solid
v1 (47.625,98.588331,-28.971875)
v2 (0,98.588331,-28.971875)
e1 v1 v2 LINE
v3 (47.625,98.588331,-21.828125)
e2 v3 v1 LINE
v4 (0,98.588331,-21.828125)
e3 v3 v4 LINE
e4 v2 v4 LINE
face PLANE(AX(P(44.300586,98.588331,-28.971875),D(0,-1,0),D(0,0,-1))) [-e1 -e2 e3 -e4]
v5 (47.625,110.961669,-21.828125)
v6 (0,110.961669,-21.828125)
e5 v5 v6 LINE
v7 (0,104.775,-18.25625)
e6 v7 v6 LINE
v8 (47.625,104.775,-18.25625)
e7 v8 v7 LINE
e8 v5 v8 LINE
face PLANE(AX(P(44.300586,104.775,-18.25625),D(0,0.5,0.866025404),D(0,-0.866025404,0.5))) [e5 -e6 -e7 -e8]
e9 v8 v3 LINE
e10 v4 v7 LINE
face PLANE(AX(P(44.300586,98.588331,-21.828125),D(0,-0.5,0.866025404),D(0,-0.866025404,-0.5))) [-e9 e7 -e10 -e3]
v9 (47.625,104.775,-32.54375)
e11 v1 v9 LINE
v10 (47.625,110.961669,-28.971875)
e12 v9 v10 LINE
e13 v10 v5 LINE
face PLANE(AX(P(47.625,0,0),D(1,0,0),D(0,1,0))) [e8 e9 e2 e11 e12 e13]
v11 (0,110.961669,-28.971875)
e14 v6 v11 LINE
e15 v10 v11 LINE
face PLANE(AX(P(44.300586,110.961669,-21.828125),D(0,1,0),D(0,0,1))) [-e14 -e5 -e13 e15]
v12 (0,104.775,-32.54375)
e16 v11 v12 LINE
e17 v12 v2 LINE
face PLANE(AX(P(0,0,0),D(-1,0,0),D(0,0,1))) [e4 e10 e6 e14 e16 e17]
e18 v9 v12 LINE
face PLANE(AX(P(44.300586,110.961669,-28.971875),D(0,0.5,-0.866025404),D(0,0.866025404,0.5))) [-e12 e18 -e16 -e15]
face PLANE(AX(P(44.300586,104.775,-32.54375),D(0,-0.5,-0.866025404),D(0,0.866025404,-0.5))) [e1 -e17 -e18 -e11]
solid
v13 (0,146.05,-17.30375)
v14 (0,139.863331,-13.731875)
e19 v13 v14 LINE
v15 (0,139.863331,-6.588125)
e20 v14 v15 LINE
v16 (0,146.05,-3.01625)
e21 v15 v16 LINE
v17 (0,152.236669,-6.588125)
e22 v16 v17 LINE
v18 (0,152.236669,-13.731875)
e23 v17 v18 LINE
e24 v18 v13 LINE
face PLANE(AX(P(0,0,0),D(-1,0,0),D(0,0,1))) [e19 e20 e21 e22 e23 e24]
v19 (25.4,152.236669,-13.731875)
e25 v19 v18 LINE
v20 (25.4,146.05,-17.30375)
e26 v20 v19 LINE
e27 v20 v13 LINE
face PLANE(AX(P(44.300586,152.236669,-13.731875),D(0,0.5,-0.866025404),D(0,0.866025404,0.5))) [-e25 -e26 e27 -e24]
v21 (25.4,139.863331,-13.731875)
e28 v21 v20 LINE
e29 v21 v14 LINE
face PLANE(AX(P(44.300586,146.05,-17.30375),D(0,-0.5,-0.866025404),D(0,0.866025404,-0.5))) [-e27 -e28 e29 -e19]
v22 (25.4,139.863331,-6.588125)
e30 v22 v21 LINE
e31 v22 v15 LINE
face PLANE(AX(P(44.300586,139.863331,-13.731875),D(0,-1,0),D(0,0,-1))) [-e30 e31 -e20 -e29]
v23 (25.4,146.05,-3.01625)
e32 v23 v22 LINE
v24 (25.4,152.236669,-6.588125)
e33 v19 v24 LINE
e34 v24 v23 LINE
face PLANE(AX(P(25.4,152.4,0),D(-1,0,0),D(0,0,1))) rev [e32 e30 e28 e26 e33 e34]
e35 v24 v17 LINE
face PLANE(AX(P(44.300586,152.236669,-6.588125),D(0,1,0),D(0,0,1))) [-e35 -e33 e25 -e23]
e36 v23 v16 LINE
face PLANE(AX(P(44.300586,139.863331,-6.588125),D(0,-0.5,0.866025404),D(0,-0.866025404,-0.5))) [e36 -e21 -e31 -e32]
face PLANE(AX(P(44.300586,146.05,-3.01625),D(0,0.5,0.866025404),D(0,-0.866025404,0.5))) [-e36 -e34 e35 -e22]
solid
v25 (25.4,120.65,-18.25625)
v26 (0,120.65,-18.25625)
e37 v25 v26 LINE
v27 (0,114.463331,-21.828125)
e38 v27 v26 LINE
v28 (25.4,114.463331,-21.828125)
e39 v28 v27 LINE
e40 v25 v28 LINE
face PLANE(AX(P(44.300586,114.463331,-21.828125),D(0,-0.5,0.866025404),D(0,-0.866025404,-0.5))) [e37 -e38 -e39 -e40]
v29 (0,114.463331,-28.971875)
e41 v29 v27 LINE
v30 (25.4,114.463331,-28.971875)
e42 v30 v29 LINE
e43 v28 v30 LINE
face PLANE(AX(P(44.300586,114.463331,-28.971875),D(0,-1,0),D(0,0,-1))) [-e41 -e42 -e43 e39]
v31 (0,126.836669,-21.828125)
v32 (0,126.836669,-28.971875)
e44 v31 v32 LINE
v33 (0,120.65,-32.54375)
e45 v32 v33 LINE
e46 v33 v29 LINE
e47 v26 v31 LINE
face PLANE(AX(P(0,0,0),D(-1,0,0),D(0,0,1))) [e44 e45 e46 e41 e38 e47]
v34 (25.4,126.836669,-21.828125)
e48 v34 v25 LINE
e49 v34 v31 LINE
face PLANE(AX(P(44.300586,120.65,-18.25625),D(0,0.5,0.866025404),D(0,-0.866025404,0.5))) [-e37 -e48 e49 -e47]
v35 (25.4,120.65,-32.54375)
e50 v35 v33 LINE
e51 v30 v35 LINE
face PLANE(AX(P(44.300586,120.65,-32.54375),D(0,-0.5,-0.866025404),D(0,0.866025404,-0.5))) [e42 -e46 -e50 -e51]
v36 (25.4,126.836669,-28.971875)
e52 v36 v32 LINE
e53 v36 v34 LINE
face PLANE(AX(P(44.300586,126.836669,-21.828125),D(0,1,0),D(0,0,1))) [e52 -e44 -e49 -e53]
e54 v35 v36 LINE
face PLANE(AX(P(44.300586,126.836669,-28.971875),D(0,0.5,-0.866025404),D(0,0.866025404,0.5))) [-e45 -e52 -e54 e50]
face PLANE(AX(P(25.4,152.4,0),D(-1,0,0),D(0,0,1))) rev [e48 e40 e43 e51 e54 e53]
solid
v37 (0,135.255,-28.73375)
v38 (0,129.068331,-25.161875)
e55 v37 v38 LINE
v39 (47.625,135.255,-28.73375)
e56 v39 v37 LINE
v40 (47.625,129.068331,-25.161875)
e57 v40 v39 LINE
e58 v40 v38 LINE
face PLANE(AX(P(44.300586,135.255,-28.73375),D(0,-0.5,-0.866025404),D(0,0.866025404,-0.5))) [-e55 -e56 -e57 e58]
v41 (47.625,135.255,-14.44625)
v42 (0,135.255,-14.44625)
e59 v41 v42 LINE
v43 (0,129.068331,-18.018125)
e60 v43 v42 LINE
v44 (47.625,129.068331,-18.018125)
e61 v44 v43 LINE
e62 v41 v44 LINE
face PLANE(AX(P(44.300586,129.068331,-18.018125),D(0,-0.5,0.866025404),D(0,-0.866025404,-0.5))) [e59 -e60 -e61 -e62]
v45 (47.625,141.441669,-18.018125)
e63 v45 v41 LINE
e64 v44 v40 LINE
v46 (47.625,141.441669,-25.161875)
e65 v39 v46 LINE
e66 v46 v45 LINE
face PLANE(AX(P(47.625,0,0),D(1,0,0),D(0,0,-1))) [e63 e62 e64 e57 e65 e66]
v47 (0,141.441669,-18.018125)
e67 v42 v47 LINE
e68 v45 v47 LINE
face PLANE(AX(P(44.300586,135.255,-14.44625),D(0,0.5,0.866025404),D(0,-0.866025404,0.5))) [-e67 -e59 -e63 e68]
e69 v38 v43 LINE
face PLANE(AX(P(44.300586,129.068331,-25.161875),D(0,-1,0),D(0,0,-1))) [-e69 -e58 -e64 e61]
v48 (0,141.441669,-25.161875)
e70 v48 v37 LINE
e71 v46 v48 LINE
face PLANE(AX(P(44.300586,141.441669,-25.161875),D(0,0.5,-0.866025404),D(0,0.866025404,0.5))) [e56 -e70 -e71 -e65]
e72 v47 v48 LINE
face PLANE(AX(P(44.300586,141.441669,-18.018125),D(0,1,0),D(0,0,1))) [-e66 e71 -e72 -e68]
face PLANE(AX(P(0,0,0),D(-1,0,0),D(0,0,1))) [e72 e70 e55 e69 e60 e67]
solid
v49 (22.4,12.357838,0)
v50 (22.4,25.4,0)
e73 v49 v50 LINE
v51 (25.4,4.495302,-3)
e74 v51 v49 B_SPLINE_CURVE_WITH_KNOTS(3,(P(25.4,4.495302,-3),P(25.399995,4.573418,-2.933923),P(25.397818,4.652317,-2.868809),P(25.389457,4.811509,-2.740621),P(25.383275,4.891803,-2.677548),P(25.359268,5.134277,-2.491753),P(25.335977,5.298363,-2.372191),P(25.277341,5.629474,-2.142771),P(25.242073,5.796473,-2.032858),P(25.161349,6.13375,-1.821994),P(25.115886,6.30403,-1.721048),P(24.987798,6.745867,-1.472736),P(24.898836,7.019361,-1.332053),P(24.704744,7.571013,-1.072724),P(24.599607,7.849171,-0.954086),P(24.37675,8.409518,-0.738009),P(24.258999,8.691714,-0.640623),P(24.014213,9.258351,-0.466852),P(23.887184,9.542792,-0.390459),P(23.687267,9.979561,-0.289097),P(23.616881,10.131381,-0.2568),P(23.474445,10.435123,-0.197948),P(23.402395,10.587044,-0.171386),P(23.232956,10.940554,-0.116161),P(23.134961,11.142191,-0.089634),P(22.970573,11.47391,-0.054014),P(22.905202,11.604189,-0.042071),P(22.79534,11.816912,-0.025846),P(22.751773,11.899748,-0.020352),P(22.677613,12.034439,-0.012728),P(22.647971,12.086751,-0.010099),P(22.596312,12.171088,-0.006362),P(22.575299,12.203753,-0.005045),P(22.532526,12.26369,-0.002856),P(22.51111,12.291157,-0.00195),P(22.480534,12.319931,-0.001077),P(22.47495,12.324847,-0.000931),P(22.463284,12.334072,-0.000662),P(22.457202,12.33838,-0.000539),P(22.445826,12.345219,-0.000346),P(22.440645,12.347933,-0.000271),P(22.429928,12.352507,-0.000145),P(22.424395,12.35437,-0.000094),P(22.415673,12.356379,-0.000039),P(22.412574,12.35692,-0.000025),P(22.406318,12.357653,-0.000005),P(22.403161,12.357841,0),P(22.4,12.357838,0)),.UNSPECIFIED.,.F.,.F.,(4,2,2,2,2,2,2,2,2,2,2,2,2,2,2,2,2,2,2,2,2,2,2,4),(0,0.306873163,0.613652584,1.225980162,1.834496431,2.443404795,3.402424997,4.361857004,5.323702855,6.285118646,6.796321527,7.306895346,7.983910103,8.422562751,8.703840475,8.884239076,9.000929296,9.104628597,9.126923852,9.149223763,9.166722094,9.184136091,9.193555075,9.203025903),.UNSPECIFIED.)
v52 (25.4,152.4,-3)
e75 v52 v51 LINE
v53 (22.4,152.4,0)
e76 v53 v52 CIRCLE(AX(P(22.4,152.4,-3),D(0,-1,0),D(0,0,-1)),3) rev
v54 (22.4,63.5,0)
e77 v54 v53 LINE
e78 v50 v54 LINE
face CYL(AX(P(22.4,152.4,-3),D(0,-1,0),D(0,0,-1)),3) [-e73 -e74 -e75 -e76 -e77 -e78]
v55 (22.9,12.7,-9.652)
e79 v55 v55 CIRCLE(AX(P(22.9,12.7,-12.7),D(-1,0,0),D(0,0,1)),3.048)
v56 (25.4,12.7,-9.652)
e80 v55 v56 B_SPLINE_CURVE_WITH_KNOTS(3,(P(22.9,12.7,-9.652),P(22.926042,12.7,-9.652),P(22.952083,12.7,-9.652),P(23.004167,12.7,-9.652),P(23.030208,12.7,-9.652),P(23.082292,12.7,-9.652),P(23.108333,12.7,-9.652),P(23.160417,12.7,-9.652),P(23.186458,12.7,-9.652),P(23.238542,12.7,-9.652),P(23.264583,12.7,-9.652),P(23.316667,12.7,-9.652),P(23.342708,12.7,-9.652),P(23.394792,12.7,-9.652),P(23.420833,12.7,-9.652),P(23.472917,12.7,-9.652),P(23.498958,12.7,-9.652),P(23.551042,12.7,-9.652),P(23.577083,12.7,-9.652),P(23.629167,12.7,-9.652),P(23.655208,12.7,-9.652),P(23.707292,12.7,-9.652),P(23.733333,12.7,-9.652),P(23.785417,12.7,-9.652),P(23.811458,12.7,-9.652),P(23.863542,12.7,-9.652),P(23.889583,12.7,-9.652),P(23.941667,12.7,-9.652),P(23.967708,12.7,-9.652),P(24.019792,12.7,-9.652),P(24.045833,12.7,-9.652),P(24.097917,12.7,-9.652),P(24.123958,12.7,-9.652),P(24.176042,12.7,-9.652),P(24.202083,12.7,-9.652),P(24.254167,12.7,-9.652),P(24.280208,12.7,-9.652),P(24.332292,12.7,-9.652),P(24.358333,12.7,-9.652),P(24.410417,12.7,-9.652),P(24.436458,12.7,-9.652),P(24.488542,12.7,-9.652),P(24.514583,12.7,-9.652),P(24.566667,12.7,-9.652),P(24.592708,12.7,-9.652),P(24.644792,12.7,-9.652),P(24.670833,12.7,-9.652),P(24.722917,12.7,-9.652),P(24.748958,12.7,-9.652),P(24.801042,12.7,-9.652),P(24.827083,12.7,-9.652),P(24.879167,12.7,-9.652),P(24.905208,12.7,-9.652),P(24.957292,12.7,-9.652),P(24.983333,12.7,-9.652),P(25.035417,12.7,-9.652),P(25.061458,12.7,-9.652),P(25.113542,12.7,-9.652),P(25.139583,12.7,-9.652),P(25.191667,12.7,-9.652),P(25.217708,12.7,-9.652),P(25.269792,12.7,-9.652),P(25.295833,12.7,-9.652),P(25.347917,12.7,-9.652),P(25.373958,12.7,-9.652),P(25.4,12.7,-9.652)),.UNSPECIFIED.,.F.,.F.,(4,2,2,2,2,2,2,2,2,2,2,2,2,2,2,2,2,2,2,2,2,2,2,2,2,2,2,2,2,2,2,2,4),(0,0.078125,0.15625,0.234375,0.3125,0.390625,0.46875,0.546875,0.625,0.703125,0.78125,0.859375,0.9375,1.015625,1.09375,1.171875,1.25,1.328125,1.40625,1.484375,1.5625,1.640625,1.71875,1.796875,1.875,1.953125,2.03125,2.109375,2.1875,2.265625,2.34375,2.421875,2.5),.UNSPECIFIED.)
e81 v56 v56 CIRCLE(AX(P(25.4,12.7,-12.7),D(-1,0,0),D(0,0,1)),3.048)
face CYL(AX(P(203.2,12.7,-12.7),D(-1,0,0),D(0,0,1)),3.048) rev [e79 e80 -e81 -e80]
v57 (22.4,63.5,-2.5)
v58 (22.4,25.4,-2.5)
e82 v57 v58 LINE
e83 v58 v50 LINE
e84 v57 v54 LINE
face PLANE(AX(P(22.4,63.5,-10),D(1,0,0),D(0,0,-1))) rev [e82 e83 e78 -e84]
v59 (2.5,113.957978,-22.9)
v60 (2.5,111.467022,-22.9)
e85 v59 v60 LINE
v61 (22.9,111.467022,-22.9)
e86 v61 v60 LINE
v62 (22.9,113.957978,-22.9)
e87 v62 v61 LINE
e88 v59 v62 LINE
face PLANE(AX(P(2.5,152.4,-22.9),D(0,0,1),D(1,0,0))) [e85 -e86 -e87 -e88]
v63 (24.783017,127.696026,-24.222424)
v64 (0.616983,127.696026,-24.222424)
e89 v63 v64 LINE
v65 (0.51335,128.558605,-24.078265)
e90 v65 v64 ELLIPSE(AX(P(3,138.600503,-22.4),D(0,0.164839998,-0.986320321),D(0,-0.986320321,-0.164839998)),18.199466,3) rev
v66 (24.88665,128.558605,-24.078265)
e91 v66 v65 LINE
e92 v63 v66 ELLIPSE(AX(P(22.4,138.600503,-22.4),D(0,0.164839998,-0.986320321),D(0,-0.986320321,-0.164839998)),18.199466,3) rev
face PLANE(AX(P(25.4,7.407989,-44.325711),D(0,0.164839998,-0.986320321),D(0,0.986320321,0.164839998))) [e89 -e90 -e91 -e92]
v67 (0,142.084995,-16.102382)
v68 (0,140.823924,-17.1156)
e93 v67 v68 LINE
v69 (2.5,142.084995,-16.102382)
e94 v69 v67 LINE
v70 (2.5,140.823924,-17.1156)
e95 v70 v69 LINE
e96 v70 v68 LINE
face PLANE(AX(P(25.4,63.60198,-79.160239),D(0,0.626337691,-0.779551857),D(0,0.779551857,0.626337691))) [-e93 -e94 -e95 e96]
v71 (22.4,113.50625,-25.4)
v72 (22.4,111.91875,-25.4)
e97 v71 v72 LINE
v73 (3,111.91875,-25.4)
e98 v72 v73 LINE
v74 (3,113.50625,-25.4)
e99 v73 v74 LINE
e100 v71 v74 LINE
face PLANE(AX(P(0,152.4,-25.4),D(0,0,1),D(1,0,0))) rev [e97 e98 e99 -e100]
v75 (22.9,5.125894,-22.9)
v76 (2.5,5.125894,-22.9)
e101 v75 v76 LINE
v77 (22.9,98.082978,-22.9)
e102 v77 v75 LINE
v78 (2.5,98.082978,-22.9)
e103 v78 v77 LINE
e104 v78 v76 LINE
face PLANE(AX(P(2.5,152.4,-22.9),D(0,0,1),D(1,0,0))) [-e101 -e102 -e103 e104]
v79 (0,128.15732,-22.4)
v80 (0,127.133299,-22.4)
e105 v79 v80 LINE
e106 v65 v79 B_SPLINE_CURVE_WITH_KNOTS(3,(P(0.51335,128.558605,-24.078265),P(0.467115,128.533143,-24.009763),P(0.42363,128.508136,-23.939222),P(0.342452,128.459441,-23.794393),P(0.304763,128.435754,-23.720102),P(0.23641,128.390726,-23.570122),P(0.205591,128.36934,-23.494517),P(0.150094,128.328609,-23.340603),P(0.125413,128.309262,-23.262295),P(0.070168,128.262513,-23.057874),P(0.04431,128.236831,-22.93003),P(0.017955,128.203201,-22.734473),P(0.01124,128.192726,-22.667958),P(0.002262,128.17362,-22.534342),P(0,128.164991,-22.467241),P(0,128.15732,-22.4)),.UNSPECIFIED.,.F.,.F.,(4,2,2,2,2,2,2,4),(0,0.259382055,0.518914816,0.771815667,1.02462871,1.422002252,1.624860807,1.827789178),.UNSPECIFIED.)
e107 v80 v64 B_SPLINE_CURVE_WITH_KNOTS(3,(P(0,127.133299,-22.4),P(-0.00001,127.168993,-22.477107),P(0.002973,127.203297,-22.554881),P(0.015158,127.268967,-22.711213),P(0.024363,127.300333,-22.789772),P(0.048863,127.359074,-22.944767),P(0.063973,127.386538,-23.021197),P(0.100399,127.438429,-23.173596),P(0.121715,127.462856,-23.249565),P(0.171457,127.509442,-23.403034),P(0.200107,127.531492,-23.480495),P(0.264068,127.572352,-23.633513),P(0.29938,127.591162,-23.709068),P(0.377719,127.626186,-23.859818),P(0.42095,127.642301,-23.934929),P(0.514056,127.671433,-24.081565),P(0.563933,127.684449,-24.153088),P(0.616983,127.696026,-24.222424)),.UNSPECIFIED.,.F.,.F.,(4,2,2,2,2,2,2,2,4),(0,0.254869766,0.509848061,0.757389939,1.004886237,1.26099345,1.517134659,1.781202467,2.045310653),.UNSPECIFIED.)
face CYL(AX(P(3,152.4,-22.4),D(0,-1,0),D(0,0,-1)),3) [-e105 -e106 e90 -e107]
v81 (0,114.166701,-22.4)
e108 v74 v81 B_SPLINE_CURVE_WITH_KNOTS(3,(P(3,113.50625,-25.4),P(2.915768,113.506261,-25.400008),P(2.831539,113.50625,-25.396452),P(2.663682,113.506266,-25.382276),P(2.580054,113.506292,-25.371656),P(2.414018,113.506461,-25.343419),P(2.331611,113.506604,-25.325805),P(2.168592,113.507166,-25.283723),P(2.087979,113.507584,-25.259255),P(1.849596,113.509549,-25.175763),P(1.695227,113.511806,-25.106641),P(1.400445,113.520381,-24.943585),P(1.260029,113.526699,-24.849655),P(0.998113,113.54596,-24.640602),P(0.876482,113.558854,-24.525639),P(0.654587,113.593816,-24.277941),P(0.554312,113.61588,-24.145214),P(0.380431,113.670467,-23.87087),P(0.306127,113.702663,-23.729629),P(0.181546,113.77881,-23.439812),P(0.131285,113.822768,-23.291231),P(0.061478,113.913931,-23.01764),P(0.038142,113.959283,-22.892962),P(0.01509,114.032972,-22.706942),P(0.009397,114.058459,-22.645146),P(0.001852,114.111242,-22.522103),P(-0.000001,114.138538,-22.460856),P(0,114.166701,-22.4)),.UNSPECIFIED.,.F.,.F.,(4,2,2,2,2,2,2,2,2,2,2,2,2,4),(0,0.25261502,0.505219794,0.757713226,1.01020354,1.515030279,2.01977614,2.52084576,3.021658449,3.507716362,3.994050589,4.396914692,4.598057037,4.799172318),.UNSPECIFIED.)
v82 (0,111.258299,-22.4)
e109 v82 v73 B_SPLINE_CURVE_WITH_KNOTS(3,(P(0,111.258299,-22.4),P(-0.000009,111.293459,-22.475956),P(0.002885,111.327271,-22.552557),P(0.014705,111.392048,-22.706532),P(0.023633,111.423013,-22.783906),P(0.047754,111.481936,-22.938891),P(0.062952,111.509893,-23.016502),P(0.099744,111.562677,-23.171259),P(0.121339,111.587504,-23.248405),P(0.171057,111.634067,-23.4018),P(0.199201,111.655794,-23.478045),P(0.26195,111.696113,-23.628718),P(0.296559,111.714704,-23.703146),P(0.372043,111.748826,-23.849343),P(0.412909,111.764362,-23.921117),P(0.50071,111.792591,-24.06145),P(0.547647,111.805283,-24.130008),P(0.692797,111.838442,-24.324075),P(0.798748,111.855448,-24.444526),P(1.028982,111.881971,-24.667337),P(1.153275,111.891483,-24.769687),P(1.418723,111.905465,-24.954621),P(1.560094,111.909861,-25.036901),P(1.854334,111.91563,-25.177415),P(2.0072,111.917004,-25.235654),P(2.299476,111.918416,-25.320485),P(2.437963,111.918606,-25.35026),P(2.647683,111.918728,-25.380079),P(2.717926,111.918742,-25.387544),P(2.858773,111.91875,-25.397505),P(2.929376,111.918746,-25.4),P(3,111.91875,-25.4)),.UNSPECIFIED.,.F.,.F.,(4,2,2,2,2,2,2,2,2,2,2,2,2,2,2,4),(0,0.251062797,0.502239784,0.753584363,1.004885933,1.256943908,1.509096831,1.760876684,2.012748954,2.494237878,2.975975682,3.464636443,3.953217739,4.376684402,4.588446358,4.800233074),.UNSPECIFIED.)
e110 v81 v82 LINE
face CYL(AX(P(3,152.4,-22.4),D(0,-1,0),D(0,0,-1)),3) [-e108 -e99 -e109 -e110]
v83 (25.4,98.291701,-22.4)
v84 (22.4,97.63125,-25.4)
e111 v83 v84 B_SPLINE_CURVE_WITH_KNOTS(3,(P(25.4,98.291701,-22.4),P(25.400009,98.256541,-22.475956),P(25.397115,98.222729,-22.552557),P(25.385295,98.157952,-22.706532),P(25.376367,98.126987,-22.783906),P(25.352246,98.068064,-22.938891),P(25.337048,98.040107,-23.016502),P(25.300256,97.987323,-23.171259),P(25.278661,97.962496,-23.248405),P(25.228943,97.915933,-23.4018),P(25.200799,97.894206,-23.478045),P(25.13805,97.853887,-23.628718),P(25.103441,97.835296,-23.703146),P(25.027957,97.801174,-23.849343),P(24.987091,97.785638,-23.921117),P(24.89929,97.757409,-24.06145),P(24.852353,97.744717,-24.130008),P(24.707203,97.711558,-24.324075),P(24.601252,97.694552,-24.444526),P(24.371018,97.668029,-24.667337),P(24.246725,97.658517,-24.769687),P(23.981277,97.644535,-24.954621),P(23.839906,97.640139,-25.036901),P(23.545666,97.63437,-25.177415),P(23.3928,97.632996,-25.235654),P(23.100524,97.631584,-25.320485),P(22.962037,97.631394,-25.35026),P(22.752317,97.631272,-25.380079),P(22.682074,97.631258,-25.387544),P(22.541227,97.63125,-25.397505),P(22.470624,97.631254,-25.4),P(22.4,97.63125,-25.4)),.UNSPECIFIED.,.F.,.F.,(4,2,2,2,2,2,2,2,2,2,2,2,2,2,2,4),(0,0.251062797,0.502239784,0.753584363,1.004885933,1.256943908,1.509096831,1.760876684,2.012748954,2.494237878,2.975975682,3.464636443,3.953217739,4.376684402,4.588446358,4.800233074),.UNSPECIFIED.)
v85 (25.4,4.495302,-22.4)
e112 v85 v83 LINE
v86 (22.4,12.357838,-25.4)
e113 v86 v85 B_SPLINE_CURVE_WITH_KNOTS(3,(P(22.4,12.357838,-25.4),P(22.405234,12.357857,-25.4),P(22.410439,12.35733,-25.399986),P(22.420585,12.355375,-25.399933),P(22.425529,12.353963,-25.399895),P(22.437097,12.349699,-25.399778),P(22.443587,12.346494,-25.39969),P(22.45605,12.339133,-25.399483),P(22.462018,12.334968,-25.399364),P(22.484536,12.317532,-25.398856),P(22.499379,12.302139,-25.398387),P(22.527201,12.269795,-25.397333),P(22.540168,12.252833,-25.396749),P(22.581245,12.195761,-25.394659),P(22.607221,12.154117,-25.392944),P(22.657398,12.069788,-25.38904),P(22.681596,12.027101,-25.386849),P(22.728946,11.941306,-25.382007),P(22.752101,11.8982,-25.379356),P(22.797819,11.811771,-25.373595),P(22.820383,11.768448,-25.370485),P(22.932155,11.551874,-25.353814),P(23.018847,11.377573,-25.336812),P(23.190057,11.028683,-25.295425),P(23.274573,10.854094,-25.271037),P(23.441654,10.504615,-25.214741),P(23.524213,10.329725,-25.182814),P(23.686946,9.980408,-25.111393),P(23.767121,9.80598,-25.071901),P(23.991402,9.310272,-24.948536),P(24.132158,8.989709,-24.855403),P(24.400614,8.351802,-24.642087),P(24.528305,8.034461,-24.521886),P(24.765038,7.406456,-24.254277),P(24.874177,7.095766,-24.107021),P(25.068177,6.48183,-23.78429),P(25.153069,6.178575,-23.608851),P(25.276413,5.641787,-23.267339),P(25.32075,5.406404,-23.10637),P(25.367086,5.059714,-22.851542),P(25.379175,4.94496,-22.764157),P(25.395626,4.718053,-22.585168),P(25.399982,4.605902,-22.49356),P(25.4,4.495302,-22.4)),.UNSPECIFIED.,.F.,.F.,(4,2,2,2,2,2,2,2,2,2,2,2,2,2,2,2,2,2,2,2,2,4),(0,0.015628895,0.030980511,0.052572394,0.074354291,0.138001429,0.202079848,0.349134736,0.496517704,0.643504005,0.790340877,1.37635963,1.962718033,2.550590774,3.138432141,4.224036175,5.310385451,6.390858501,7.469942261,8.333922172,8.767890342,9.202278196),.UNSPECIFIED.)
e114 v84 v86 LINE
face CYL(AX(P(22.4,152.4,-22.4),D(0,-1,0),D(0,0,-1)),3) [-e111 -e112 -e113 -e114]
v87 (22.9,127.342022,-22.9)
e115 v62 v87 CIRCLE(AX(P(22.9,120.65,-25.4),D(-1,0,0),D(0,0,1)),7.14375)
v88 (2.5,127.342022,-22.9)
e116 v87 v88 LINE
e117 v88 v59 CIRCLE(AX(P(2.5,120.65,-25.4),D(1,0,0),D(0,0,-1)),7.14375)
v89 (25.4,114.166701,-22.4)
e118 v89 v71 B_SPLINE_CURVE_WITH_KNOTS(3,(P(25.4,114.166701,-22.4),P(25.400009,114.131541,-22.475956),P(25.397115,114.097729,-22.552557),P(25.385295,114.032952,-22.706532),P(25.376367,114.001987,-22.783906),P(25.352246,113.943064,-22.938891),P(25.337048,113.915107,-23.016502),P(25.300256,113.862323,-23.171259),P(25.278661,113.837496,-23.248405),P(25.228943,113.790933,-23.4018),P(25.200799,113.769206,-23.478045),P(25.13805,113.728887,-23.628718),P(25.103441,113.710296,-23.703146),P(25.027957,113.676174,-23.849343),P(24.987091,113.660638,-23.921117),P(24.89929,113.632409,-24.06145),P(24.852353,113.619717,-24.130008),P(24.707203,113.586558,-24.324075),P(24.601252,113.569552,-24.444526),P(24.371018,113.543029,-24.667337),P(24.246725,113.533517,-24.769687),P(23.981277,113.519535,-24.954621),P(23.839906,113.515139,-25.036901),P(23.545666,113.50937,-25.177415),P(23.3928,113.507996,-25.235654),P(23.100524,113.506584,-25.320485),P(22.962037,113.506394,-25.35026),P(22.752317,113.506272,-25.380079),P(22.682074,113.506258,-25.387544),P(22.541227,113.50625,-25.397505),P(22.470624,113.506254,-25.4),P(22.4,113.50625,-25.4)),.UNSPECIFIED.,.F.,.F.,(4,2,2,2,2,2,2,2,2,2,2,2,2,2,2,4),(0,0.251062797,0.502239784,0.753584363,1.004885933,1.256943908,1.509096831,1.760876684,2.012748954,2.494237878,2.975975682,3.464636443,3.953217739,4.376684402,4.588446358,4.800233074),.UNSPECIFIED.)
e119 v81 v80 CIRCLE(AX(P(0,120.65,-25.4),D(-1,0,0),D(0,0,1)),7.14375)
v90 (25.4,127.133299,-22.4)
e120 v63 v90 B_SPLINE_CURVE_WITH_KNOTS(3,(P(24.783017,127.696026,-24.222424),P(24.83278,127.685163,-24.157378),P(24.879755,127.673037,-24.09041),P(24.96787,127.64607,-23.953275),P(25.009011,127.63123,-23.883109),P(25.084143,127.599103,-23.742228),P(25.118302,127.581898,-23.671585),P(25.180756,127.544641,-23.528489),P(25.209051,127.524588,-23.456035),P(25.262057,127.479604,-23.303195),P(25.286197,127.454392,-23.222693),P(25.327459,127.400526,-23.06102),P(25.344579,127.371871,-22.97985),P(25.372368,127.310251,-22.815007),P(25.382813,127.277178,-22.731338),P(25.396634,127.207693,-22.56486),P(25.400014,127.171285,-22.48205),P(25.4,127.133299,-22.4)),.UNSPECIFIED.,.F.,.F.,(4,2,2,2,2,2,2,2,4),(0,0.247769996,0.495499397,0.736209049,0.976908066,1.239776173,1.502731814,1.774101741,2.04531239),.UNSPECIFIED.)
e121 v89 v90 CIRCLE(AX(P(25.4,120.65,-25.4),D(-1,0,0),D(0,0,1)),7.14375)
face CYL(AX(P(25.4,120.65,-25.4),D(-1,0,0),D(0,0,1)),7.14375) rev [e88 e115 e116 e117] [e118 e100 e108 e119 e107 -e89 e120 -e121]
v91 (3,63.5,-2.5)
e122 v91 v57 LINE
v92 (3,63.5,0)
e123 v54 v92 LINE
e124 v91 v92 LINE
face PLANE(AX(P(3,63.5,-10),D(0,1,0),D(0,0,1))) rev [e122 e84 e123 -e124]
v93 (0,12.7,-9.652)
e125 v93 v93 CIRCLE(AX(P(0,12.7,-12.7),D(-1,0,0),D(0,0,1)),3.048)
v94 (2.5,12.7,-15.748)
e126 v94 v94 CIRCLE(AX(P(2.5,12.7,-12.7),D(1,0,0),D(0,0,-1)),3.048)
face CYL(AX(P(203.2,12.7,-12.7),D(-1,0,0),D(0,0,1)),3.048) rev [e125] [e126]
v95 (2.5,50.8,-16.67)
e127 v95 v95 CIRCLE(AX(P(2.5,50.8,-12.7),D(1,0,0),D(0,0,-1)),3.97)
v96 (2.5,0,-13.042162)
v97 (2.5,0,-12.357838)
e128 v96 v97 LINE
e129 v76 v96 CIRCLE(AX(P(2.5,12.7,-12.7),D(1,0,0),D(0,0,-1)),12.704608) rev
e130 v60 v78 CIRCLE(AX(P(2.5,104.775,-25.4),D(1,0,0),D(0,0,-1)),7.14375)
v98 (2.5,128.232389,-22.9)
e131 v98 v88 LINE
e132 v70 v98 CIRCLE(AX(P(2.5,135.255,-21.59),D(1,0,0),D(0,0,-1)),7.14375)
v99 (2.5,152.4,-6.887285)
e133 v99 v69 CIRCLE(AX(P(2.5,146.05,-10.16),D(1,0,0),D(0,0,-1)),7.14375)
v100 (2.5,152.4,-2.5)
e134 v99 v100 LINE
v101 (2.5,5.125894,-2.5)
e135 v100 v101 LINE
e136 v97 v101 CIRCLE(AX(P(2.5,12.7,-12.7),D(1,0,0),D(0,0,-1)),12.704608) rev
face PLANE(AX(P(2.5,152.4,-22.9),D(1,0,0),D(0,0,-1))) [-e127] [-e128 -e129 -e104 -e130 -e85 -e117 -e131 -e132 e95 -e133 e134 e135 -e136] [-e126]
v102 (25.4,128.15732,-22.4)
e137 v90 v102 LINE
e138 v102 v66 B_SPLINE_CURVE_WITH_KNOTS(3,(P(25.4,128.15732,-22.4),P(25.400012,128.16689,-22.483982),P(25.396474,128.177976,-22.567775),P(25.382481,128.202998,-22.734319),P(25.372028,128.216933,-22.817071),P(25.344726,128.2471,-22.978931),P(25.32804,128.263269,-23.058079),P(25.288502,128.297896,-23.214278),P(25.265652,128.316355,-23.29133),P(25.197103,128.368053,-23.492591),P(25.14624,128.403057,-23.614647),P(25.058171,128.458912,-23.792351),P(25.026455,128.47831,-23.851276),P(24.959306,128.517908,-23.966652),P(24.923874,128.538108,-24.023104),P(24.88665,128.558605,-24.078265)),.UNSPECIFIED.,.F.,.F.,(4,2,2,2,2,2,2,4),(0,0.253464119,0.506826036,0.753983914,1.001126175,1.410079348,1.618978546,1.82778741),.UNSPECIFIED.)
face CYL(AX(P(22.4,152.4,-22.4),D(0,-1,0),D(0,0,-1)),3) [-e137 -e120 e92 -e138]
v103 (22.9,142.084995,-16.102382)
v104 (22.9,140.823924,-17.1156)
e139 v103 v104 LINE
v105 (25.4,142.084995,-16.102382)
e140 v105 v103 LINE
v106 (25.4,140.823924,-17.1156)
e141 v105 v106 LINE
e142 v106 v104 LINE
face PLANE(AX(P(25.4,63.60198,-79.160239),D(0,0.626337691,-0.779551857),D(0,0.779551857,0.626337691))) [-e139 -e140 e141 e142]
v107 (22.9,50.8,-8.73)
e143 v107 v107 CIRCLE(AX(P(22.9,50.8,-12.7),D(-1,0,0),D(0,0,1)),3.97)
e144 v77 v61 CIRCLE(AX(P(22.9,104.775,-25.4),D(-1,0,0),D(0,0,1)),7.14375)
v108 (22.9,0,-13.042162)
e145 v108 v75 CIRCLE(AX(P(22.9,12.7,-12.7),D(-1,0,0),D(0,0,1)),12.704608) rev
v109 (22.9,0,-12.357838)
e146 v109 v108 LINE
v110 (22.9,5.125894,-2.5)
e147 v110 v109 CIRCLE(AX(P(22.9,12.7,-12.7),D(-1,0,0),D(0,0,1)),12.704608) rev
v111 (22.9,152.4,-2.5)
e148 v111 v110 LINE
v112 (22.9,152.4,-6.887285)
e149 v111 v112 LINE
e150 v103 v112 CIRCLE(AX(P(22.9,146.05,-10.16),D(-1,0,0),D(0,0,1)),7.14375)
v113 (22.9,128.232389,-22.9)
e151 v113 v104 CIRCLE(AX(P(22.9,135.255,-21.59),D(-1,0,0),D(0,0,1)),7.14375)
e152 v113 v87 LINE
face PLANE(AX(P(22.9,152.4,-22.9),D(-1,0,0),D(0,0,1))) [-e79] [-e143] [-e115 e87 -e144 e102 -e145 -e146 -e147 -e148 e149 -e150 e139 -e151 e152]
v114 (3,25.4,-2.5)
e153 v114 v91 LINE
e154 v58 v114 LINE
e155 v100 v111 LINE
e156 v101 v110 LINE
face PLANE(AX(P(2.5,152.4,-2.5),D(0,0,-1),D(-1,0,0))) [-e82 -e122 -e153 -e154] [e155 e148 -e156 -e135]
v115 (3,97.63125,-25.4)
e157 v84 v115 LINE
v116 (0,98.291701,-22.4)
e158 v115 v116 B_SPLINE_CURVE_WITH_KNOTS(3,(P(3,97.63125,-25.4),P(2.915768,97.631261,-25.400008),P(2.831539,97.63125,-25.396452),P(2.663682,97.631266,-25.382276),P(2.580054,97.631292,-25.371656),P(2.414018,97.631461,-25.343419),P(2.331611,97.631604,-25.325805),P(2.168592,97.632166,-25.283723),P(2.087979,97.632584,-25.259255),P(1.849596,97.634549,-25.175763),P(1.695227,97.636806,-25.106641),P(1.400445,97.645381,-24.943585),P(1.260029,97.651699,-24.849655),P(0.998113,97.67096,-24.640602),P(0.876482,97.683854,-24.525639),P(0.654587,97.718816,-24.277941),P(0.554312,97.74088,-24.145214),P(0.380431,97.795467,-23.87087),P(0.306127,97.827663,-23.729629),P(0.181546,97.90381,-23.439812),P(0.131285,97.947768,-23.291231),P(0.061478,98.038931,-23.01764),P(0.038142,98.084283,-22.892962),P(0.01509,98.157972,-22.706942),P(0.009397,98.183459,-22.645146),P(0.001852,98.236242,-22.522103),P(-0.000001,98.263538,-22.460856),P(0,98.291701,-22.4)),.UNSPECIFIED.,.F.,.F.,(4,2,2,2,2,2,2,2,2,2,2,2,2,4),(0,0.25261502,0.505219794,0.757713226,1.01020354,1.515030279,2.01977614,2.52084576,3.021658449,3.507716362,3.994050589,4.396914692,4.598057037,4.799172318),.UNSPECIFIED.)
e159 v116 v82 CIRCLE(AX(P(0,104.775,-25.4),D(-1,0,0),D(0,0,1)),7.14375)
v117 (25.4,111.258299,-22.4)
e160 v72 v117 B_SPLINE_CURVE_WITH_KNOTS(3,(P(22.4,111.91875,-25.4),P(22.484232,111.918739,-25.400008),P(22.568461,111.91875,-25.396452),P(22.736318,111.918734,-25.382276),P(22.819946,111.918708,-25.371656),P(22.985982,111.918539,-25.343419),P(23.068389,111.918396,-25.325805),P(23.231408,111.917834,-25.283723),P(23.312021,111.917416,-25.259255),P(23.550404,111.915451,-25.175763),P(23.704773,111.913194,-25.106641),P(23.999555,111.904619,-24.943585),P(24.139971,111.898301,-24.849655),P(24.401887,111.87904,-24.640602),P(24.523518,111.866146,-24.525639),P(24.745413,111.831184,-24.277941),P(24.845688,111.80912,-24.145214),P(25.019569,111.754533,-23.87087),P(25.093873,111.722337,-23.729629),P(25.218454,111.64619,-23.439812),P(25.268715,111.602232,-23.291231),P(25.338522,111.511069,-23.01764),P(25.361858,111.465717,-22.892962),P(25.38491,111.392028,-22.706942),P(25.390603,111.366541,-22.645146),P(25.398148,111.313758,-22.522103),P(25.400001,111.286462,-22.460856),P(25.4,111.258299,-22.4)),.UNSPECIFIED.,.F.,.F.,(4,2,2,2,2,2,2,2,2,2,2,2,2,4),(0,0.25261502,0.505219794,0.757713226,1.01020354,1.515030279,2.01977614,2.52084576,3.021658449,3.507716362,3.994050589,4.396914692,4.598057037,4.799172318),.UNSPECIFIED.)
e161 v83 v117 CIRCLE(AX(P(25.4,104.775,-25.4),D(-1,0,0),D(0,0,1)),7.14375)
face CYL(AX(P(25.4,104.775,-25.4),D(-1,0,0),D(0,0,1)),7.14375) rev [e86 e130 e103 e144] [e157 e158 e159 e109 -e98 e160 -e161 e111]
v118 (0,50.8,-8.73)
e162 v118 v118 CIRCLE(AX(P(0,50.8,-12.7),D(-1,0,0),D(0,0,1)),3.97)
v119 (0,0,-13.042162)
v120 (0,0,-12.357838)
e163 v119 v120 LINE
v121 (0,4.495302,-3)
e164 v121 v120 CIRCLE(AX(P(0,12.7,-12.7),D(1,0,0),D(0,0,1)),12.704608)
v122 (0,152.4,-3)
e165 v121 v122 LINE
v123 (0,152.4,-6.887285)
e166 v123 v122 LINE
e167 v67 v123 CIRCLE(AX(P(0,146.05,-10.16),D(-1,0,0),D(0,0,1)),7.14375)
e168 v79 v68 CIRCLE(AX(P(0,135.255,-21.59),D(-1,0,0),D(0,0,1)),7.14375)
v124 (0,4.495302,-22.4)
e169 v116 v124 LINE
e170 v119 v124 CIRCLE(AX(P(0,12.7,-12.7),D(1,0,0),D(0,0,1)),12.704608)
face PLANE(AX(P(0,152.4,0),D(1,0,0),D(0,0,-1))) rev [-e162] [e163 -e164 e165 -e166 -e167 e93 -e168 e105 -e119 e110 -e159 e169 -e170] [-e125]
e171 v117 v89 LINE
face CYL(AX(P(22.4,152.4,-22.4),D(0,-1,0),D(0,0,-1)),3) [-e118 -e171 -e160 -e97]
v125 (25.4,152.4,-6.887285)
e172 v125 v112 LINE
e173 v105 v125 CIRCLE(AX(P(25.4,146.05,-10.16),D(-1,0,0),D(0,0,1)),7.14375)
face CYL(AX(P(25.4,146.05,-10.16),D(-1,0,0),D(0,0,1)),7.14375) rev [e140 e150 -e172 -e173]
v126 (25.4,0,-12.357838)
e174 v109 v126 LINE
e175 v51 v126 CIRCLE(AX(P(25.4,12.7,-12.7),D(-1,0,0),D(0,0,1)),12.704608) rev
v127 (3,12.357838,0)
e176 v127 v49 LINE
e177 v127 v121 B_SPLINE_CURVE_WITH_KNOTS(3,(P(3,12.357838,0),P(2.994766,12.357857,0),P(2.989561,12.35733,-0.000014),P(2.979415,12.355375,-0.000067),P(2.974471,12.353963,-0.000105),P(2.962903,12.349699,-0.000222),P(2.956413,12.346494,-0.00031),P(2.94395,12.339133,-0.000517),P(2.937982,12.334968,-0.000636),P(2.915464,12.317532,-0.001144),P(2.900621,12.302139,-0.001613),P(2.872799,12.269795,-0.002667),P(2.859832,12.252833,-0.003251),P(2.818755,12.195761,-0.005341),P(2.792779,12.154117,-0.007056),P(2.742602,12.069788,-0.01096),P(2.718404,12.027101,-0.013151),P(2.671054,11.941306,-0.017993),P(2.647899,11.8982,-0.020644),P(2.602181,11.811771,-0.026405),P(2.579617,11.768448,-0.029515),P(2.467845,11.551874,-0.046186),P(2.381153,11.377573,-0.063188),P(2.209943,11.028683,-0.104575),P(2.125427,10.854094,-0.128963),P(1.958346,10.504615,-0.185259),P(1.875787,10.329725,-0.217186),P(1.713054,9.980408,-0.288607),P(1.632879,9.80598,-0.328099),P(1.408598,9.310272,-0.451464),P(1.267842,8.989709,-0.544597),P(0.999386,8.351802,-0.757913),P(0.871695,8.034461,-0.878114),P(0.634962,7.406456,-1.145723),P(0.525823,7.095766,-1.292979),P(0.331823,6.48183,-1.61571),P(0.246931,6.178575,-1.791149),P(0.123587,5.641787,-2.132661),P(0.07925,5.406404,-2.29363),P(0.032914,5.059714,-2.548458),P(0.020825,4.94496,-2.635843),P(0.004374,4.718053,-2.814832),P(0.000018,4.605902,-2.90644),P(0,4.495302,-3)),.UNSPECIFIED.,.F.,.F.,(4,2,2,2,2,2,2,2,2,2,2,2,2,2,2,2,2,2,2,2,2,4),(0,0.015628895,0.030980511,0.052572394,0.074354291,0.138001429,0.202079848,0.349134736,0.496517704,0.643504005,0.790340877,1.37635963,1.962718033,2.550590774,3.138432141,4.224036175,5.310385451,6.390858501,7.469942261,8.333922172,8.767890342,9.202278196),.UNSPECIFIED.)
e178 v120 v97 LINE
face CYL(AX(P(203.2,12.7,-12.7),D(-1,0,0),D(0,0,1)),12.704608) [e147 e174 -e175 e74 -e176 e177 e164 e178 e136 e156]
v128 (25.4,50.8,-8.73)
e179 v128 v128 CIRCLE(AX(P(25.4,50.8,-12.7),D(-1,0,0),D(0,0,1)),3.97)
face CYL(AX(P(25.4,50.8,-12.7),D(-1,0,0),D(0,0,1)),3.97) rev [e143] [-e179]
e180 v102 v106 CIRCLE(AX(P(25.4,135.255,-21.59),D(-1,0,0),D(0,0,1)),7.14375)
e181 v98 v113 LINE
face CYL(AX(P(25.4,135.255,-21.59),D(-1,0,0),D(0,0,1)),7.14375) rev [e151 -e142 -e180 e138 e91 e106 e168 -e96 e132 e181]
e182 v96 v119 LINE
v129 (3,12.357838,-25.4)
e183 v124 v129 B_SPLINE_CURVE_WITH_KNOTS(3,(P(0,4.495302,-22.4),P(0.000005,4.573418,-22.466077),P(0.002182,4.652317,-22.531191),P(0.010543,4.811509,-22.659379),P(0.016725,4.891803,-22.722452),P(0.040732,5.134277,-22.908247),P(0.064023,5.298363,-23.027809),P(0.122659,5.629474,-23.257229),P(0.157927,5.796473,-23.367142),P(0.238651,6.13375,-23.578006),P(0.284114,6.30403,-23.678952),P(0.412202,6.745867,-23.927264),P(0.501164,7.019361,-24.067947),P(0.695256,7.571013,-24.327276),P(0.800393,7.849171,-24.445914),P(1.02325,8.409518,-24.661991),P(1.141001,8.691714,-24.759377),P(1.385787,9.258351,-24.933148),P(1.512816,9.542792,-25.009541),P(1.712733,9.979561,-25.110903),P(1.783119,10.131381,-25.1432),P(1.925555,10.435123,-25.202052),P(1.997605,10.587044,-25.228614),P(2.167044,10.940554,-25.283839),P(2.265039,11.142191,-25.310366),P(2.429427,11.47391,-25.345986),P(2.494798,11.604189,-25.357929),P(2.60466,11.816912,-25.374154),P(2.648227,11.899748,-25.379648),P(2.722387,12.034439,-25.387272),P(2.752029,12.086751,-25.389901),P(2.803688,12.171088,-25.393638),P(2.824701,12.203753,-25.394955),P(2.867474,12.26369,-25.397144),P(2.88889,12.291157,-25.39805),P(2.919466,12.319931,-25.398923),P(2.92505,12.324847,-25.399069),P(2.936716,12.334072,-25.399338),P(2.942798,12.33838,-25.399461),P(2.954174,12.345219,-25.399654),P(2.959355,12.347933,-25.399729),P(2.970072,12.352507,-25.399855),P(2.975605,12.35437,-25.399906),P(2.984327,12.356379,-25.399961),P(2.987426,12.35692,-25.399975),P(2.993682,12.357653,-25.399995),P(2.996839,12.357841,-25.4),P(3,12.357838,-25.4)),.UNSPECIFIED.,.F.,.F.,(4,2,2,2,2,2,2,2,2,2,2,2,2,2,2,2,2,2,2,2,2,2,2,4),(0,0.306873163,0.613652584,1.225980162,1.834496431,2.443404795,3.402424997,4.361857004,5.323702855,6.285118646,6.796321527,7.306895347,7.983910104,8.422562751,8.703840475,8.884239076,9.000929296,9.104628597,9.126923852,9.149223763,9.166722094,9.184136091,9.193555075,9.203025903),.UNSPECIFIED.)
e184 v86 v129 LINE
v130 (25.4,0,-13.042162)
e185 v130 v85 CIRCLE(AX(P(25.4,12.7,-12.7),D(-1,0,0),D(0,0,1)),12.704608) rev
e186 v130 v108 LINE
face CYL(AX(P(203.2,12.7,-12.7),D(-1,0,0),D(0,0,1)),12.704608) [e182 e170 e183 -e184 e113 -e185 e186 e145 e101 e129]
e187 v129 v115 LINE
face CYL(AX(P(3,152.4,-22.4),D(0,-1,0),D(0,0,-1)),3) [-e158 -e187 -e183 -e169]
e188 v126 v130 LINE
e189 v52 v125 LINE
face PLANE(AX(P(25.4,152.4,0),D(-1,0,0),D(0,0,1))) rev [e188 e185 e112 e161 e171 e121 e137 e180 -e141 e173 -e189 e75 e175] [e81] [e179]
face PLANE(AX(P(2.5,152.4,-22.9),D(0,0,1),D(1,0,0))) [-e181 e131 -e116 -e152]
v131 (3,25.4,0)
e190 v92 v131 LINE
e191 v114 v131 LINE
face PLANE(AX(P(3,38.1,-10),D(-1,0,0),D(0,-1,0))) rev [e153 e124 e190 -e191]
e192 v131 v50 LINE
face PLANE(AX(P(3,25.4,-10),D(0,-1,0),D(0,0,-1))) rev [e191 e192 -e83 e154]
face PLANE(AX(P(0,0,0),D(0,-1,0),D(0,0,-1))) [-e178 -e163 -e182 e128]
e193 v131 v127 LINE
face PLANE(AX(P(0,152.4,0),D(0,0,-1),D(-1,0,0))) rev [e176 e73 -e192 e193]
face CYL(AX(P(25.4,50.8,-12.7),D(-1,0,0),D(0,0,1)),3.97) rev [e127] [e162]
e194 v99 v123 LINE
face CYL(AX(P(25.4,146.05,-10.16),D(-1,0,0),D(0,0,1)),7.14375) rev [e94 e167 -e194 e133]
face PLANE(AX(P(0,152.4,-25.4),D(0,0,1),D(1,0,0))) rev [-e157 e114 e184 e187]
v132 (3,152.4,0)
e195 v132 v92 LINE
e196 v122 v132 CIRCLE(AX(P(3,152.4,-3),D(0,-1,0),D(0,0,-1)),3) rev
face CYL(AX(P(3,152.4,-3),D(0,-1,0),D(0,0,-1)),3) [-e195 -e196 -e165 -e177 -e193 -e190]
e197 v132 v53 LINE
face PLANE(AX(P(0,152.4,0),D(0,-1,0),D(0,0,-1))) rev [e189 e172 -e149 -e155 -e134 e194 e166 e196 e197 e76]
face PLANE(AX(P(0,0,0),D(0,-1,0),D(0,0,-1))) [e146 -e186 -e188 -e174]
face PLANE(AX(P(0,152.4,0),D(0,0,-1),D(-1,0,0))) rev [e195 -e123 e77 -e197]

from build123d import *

# Parameters (mm, degrees)
SKETCH1_W             = 25.4
SKETCH1_H             = 25.4
SKETCH1_W_2           = 20.4
SKETCH1_H_2           = 20.4
BOSS_EXTRUDE1_DEPTH   = 152.4
SKETCH2_R             = 3.048
CUT_EXTRUDE1_DEPTH    = 203.2
FILLET1_R             = 3
SKETCH15_R            = 3.97
CUT_EXTRUDE9_DEPTH    = 157.576115805
CUT_EXTRUDE10_DEPTH   = 10
CUT_EXTRUDE11_START   = -25.4
CUT_EXTRUDE11_DEPTH   = 25.4
BOSS_EXTRUDE2_DEPTH   = 25.4
BOSS_EXTRUDE2_2_DEPTH = 25.4
BOSS_EXTRUDE2_3_DEPTH = 25.4
BOSS_EXTRUDE2_4_DEPTH = 25.4
BOSS_EXTRUDE3_DEPTH   = 22.225


# Read off the part's stored shape, not the designer's step: Cut-Extrude11
with BuildPart() as part:
    # Sketch1 → Boss-Extrude1 (new body)
    with BuildSketch(Plane(origin=(0, 0, 0), x_dir=(1, 0, 0), z_dir=(0, 1, 0))):
        with Locations((12.7, 12.7)):
            Rectangle(SKETCH1_W, SKETCH1_H)
        with Locations((12.7, 12.7)):
            Rectangle(SKETCH1_W_2, SKETCH1_H_2, mode=Mode.SUBTRACT)
    extrude(amount=BOSS_EXTRUDE1_DEPTH)

    # Sketch2 → Cut-Extrude1 (cut)
    with BuildSketch(Plane.ZY):
        with Locations((-12.7, 12.7)):
            Circle(SKETCH2_R)
        with BuildLine():
            Line((-25.4, 13.042161995), (-33.088640308, 13.042161995))
            Line((-33.088640308, 13.042161995), (-33.088640308, -7.68562413))
            Line((-33.088640308, -7.68562413), (17.838569311, -8.829541687))
            Line((17.838569311, -8.829541687), (0.004608409, 12.7))
            ThreePointArc((0.004608409, 12.7), (-12.871096514, -0.003456255), (-25.4, 13.042161995))
        make_face()
    extrude(amount=-CUT_EXTRUDE1_DEPTH, mode=Mode.SUBTRACT)

    # Fillet1
    # the kernel refuses this fillet: 3 mm, written as the material it takes off along each edge
    with BuildSketch(Plane(origin=(0, 170.4, -25.4), x_dir=(0, 0, 1), z_dir=(0, -1, 0)), Plane(origin=(25.4, -5.642161995, 0), x_dir=(-1, 0, 0), z_dir=(0, 1, 0))) as fillet1_piece_1:
        with BuildLine():
            CenterArc((FILLET1_R, -FILLET1_R), FILLET1_R, 90, 90)
            Line((0, -FILLET1_R), (-FILLET1_R * 0.02, -FILLET1_R))
            Line((-FILLET1_R * 0.02, -FILLET1_R), (-FILLET1_R * 0.02, FILLET1_R * 0.02))
            Line((-FILLET1_R * 0.02, FILLET1_R * 0.02), (FILLET1_R, FILLET1_R * 0.02))
            Line((FILLET1_R, FILLET1_R * 0.02), (FILLET1_R, 0))
        make_face()
    extrude(amount=176.042161995, mode=Mode.SUBTRACT)
    with BuildSketch(Plane(origin=(25.4, -5.642161995, -25.4), x_dir=(-1, 0, 0), z_dir=(0, 1, 0)), Plane(origin=(0, -5.642161995, 0), x_dir=(1, 0, 0), z_dir=(0, 1, 0))) as fillet1_piece_2:
        with BuildLine():
            CenterArc((FILLET1_R, FILLET1_R), FILLET1_R, 180, 90)
            Line((0, FILLET1_R), (-FILLET1_R * 0.02, FILLET1_R))
            Line((-FILLET1_R * 0.02, FILLET1_R), (-FILLET1_R * 0.02, -FILLET1_R * 0.02))
            Line((-FILLET1_R * 0.02, -FILLET1_R * 0.02), (FILLET1_R, -FILLET1_R * 0.02))
            Line((FILLET1_R, -FILLET1_R * 0.02), (FILLET1_R, 0))
        make_face()
    extrude(amount=176.042161995, mode=Mode.SUBTRACT)

    # Sketch15 → Cut-Extrude9 (cut, through all)
    with BuildSketch(Plane.ZY):
        with Locations((-12.7, 50.8)):
            Circle(SKETCH15_R)
    extrude(amount=-CUT_EXTRUDE9_DEPTH, mode=Mode.SUBTRACT)

    # Sketch16 → Cut-Extrude10 (cut)
    with BuildSketch(Plane.XY):
        Polygon((3, 63.5), (22.4, 63.5), (22.4, 38.1), (22.4, 25.4), (3, 25.4), (3, 38.1), align=None)
    extrude(amount=-CUT_EXTRUDE10_DEPTH, mode=Mode.SUBTRACT)

    # Cut-Extrude11 outline → Cut-Extrude11 (cut)
    with BuildSketch(Plane.ZY.offset(CUT_EXTRUDE11_START)):
        with BuildLine():
            Line((-17.115600123, 140.823923576), (-16.102381509, 142.084994822))
            ThreePointArc((-16.102381509, 142.084994822), (-4.832560404, 141.290635399), (-6.88728491, 152.4))
            Line((-6.88728491, 152.4), (-25.4, 152.4))
            Line((-25.4, 152.4), (-25.400002306, 113.50625))
            ThreePointArc((-25.400002306, 113.50625), (-18.280723067, 120.059186987), (-24.222424264, 127.696025791))
            Line((-24.222424264, 127.696025791), (-24.078264617, 128.558605204))
            ThreePointArc((-24.078264617, 128.558605204), (-15.377456881, 131.728319967), (-17.115600123, 140.823923576))
        make_face()
        with BuildLine():
            Line((-25.400002306, 111.91875), (-25.400002306, 97.63125))
            ThreePointArc((-25.400002306, 97.63125), (-18.25625, 104.775), (-25.400002306, 111.91875))
        make_face()
    extrude(amount=CUT_EXTRUDE11_DEPTH, mode=Mode.SUBTRACT)


with BuildPart() as body_2:
    # Sketch21 → Boss-Extrude2 (new body)
    with BuildSketch(Plane.ZY):
        Polygon((-28.971875, 110.961668978), (-32.54375, 104.775), (-28.971875, 98.588331022), (-21.828125, 98.588331022), (-18.25625, 104.775), (-21.828125, 110.961668978), align=None)
    extrude(amount=-BOSS_EXTRUDE2_DEPTH)



with BuildPart() as body_3:
    # Sketch21 → Boss-Extrude2 2 (new body)
    with BuildSketch(Plane.ZY):
        Polygon((-18.25625, 120.65), (-21.828125, 126.836668978), (-28.971875, 126.836668978), (-32.54375, 120.65), (-28.971875, 114.463331022), (-21.828125, 114.463331022), align=None)
    extrude(amount=-BOSS_EXTRUDE2_2_DEPTH)


with BuildPart() as body_4:
    # Sketch21 → Boss-Extrude2 3 (new body)
    with BuildSketch(Plane.ZY):
        Polygon((-18.018125, 141.441668978), (-25.161875, 141.441668978), (-28.73375, 135.255), (-25.161875, 129.068331022), (-18.018125, 129.068331022), (-14.44625, 135.255), align=None)
    extrude(amount=-BOSS_EXTRUDE2_3_DEPTH)


with BuildPart() as body_5:
    # Sketch21 → Boss-Extrude2 4 (new body)
    with BuildSketch(Plane.ZY):
        Polygon((-3.01625, 146.05), (-6.588125, 152.236668978), (-13.731875, 152.236668978), (-17.30375, 146.05), (-13.731875, 139.863331022), (-6.588125, 139.863331022), align=None)
    extrude(amount=-BOSS_EXTRUDE2_4_DEPTH)


with BuildPart() as body_2_1:
    add(body_2.part)

    add(body_4.part)  # Boss-Extrude3 merges body 4
    # Sketch22 → Boss-Extrude3 (add)
    with BuildSketch(Plane(origin=(25.4, 0, 0), x_dir=(0, 0, -1), z_dir=(1, 0, 0))):
        Polygon((18.018125, 141.441668978), (14.44625, 135.255), (18.018125, 129.068331022), (25.161875, 129.068331022), (28.73375, 135.255), (25.161875, 141.441668978), align=None)
        Polygon((28.971875, 110.961668978), (21.828125, 110.961668978), (18.25625, 104.775), (21.828125, 98.588331022), (28.971875, 98.588331022), (32.54375, 104.775), align=None)
    extrude(amount=BOSS_EXTRUDE3_DEPTH)


solid = Compound([part.part, body_3.part, body_5.part, body_2_1.part])
